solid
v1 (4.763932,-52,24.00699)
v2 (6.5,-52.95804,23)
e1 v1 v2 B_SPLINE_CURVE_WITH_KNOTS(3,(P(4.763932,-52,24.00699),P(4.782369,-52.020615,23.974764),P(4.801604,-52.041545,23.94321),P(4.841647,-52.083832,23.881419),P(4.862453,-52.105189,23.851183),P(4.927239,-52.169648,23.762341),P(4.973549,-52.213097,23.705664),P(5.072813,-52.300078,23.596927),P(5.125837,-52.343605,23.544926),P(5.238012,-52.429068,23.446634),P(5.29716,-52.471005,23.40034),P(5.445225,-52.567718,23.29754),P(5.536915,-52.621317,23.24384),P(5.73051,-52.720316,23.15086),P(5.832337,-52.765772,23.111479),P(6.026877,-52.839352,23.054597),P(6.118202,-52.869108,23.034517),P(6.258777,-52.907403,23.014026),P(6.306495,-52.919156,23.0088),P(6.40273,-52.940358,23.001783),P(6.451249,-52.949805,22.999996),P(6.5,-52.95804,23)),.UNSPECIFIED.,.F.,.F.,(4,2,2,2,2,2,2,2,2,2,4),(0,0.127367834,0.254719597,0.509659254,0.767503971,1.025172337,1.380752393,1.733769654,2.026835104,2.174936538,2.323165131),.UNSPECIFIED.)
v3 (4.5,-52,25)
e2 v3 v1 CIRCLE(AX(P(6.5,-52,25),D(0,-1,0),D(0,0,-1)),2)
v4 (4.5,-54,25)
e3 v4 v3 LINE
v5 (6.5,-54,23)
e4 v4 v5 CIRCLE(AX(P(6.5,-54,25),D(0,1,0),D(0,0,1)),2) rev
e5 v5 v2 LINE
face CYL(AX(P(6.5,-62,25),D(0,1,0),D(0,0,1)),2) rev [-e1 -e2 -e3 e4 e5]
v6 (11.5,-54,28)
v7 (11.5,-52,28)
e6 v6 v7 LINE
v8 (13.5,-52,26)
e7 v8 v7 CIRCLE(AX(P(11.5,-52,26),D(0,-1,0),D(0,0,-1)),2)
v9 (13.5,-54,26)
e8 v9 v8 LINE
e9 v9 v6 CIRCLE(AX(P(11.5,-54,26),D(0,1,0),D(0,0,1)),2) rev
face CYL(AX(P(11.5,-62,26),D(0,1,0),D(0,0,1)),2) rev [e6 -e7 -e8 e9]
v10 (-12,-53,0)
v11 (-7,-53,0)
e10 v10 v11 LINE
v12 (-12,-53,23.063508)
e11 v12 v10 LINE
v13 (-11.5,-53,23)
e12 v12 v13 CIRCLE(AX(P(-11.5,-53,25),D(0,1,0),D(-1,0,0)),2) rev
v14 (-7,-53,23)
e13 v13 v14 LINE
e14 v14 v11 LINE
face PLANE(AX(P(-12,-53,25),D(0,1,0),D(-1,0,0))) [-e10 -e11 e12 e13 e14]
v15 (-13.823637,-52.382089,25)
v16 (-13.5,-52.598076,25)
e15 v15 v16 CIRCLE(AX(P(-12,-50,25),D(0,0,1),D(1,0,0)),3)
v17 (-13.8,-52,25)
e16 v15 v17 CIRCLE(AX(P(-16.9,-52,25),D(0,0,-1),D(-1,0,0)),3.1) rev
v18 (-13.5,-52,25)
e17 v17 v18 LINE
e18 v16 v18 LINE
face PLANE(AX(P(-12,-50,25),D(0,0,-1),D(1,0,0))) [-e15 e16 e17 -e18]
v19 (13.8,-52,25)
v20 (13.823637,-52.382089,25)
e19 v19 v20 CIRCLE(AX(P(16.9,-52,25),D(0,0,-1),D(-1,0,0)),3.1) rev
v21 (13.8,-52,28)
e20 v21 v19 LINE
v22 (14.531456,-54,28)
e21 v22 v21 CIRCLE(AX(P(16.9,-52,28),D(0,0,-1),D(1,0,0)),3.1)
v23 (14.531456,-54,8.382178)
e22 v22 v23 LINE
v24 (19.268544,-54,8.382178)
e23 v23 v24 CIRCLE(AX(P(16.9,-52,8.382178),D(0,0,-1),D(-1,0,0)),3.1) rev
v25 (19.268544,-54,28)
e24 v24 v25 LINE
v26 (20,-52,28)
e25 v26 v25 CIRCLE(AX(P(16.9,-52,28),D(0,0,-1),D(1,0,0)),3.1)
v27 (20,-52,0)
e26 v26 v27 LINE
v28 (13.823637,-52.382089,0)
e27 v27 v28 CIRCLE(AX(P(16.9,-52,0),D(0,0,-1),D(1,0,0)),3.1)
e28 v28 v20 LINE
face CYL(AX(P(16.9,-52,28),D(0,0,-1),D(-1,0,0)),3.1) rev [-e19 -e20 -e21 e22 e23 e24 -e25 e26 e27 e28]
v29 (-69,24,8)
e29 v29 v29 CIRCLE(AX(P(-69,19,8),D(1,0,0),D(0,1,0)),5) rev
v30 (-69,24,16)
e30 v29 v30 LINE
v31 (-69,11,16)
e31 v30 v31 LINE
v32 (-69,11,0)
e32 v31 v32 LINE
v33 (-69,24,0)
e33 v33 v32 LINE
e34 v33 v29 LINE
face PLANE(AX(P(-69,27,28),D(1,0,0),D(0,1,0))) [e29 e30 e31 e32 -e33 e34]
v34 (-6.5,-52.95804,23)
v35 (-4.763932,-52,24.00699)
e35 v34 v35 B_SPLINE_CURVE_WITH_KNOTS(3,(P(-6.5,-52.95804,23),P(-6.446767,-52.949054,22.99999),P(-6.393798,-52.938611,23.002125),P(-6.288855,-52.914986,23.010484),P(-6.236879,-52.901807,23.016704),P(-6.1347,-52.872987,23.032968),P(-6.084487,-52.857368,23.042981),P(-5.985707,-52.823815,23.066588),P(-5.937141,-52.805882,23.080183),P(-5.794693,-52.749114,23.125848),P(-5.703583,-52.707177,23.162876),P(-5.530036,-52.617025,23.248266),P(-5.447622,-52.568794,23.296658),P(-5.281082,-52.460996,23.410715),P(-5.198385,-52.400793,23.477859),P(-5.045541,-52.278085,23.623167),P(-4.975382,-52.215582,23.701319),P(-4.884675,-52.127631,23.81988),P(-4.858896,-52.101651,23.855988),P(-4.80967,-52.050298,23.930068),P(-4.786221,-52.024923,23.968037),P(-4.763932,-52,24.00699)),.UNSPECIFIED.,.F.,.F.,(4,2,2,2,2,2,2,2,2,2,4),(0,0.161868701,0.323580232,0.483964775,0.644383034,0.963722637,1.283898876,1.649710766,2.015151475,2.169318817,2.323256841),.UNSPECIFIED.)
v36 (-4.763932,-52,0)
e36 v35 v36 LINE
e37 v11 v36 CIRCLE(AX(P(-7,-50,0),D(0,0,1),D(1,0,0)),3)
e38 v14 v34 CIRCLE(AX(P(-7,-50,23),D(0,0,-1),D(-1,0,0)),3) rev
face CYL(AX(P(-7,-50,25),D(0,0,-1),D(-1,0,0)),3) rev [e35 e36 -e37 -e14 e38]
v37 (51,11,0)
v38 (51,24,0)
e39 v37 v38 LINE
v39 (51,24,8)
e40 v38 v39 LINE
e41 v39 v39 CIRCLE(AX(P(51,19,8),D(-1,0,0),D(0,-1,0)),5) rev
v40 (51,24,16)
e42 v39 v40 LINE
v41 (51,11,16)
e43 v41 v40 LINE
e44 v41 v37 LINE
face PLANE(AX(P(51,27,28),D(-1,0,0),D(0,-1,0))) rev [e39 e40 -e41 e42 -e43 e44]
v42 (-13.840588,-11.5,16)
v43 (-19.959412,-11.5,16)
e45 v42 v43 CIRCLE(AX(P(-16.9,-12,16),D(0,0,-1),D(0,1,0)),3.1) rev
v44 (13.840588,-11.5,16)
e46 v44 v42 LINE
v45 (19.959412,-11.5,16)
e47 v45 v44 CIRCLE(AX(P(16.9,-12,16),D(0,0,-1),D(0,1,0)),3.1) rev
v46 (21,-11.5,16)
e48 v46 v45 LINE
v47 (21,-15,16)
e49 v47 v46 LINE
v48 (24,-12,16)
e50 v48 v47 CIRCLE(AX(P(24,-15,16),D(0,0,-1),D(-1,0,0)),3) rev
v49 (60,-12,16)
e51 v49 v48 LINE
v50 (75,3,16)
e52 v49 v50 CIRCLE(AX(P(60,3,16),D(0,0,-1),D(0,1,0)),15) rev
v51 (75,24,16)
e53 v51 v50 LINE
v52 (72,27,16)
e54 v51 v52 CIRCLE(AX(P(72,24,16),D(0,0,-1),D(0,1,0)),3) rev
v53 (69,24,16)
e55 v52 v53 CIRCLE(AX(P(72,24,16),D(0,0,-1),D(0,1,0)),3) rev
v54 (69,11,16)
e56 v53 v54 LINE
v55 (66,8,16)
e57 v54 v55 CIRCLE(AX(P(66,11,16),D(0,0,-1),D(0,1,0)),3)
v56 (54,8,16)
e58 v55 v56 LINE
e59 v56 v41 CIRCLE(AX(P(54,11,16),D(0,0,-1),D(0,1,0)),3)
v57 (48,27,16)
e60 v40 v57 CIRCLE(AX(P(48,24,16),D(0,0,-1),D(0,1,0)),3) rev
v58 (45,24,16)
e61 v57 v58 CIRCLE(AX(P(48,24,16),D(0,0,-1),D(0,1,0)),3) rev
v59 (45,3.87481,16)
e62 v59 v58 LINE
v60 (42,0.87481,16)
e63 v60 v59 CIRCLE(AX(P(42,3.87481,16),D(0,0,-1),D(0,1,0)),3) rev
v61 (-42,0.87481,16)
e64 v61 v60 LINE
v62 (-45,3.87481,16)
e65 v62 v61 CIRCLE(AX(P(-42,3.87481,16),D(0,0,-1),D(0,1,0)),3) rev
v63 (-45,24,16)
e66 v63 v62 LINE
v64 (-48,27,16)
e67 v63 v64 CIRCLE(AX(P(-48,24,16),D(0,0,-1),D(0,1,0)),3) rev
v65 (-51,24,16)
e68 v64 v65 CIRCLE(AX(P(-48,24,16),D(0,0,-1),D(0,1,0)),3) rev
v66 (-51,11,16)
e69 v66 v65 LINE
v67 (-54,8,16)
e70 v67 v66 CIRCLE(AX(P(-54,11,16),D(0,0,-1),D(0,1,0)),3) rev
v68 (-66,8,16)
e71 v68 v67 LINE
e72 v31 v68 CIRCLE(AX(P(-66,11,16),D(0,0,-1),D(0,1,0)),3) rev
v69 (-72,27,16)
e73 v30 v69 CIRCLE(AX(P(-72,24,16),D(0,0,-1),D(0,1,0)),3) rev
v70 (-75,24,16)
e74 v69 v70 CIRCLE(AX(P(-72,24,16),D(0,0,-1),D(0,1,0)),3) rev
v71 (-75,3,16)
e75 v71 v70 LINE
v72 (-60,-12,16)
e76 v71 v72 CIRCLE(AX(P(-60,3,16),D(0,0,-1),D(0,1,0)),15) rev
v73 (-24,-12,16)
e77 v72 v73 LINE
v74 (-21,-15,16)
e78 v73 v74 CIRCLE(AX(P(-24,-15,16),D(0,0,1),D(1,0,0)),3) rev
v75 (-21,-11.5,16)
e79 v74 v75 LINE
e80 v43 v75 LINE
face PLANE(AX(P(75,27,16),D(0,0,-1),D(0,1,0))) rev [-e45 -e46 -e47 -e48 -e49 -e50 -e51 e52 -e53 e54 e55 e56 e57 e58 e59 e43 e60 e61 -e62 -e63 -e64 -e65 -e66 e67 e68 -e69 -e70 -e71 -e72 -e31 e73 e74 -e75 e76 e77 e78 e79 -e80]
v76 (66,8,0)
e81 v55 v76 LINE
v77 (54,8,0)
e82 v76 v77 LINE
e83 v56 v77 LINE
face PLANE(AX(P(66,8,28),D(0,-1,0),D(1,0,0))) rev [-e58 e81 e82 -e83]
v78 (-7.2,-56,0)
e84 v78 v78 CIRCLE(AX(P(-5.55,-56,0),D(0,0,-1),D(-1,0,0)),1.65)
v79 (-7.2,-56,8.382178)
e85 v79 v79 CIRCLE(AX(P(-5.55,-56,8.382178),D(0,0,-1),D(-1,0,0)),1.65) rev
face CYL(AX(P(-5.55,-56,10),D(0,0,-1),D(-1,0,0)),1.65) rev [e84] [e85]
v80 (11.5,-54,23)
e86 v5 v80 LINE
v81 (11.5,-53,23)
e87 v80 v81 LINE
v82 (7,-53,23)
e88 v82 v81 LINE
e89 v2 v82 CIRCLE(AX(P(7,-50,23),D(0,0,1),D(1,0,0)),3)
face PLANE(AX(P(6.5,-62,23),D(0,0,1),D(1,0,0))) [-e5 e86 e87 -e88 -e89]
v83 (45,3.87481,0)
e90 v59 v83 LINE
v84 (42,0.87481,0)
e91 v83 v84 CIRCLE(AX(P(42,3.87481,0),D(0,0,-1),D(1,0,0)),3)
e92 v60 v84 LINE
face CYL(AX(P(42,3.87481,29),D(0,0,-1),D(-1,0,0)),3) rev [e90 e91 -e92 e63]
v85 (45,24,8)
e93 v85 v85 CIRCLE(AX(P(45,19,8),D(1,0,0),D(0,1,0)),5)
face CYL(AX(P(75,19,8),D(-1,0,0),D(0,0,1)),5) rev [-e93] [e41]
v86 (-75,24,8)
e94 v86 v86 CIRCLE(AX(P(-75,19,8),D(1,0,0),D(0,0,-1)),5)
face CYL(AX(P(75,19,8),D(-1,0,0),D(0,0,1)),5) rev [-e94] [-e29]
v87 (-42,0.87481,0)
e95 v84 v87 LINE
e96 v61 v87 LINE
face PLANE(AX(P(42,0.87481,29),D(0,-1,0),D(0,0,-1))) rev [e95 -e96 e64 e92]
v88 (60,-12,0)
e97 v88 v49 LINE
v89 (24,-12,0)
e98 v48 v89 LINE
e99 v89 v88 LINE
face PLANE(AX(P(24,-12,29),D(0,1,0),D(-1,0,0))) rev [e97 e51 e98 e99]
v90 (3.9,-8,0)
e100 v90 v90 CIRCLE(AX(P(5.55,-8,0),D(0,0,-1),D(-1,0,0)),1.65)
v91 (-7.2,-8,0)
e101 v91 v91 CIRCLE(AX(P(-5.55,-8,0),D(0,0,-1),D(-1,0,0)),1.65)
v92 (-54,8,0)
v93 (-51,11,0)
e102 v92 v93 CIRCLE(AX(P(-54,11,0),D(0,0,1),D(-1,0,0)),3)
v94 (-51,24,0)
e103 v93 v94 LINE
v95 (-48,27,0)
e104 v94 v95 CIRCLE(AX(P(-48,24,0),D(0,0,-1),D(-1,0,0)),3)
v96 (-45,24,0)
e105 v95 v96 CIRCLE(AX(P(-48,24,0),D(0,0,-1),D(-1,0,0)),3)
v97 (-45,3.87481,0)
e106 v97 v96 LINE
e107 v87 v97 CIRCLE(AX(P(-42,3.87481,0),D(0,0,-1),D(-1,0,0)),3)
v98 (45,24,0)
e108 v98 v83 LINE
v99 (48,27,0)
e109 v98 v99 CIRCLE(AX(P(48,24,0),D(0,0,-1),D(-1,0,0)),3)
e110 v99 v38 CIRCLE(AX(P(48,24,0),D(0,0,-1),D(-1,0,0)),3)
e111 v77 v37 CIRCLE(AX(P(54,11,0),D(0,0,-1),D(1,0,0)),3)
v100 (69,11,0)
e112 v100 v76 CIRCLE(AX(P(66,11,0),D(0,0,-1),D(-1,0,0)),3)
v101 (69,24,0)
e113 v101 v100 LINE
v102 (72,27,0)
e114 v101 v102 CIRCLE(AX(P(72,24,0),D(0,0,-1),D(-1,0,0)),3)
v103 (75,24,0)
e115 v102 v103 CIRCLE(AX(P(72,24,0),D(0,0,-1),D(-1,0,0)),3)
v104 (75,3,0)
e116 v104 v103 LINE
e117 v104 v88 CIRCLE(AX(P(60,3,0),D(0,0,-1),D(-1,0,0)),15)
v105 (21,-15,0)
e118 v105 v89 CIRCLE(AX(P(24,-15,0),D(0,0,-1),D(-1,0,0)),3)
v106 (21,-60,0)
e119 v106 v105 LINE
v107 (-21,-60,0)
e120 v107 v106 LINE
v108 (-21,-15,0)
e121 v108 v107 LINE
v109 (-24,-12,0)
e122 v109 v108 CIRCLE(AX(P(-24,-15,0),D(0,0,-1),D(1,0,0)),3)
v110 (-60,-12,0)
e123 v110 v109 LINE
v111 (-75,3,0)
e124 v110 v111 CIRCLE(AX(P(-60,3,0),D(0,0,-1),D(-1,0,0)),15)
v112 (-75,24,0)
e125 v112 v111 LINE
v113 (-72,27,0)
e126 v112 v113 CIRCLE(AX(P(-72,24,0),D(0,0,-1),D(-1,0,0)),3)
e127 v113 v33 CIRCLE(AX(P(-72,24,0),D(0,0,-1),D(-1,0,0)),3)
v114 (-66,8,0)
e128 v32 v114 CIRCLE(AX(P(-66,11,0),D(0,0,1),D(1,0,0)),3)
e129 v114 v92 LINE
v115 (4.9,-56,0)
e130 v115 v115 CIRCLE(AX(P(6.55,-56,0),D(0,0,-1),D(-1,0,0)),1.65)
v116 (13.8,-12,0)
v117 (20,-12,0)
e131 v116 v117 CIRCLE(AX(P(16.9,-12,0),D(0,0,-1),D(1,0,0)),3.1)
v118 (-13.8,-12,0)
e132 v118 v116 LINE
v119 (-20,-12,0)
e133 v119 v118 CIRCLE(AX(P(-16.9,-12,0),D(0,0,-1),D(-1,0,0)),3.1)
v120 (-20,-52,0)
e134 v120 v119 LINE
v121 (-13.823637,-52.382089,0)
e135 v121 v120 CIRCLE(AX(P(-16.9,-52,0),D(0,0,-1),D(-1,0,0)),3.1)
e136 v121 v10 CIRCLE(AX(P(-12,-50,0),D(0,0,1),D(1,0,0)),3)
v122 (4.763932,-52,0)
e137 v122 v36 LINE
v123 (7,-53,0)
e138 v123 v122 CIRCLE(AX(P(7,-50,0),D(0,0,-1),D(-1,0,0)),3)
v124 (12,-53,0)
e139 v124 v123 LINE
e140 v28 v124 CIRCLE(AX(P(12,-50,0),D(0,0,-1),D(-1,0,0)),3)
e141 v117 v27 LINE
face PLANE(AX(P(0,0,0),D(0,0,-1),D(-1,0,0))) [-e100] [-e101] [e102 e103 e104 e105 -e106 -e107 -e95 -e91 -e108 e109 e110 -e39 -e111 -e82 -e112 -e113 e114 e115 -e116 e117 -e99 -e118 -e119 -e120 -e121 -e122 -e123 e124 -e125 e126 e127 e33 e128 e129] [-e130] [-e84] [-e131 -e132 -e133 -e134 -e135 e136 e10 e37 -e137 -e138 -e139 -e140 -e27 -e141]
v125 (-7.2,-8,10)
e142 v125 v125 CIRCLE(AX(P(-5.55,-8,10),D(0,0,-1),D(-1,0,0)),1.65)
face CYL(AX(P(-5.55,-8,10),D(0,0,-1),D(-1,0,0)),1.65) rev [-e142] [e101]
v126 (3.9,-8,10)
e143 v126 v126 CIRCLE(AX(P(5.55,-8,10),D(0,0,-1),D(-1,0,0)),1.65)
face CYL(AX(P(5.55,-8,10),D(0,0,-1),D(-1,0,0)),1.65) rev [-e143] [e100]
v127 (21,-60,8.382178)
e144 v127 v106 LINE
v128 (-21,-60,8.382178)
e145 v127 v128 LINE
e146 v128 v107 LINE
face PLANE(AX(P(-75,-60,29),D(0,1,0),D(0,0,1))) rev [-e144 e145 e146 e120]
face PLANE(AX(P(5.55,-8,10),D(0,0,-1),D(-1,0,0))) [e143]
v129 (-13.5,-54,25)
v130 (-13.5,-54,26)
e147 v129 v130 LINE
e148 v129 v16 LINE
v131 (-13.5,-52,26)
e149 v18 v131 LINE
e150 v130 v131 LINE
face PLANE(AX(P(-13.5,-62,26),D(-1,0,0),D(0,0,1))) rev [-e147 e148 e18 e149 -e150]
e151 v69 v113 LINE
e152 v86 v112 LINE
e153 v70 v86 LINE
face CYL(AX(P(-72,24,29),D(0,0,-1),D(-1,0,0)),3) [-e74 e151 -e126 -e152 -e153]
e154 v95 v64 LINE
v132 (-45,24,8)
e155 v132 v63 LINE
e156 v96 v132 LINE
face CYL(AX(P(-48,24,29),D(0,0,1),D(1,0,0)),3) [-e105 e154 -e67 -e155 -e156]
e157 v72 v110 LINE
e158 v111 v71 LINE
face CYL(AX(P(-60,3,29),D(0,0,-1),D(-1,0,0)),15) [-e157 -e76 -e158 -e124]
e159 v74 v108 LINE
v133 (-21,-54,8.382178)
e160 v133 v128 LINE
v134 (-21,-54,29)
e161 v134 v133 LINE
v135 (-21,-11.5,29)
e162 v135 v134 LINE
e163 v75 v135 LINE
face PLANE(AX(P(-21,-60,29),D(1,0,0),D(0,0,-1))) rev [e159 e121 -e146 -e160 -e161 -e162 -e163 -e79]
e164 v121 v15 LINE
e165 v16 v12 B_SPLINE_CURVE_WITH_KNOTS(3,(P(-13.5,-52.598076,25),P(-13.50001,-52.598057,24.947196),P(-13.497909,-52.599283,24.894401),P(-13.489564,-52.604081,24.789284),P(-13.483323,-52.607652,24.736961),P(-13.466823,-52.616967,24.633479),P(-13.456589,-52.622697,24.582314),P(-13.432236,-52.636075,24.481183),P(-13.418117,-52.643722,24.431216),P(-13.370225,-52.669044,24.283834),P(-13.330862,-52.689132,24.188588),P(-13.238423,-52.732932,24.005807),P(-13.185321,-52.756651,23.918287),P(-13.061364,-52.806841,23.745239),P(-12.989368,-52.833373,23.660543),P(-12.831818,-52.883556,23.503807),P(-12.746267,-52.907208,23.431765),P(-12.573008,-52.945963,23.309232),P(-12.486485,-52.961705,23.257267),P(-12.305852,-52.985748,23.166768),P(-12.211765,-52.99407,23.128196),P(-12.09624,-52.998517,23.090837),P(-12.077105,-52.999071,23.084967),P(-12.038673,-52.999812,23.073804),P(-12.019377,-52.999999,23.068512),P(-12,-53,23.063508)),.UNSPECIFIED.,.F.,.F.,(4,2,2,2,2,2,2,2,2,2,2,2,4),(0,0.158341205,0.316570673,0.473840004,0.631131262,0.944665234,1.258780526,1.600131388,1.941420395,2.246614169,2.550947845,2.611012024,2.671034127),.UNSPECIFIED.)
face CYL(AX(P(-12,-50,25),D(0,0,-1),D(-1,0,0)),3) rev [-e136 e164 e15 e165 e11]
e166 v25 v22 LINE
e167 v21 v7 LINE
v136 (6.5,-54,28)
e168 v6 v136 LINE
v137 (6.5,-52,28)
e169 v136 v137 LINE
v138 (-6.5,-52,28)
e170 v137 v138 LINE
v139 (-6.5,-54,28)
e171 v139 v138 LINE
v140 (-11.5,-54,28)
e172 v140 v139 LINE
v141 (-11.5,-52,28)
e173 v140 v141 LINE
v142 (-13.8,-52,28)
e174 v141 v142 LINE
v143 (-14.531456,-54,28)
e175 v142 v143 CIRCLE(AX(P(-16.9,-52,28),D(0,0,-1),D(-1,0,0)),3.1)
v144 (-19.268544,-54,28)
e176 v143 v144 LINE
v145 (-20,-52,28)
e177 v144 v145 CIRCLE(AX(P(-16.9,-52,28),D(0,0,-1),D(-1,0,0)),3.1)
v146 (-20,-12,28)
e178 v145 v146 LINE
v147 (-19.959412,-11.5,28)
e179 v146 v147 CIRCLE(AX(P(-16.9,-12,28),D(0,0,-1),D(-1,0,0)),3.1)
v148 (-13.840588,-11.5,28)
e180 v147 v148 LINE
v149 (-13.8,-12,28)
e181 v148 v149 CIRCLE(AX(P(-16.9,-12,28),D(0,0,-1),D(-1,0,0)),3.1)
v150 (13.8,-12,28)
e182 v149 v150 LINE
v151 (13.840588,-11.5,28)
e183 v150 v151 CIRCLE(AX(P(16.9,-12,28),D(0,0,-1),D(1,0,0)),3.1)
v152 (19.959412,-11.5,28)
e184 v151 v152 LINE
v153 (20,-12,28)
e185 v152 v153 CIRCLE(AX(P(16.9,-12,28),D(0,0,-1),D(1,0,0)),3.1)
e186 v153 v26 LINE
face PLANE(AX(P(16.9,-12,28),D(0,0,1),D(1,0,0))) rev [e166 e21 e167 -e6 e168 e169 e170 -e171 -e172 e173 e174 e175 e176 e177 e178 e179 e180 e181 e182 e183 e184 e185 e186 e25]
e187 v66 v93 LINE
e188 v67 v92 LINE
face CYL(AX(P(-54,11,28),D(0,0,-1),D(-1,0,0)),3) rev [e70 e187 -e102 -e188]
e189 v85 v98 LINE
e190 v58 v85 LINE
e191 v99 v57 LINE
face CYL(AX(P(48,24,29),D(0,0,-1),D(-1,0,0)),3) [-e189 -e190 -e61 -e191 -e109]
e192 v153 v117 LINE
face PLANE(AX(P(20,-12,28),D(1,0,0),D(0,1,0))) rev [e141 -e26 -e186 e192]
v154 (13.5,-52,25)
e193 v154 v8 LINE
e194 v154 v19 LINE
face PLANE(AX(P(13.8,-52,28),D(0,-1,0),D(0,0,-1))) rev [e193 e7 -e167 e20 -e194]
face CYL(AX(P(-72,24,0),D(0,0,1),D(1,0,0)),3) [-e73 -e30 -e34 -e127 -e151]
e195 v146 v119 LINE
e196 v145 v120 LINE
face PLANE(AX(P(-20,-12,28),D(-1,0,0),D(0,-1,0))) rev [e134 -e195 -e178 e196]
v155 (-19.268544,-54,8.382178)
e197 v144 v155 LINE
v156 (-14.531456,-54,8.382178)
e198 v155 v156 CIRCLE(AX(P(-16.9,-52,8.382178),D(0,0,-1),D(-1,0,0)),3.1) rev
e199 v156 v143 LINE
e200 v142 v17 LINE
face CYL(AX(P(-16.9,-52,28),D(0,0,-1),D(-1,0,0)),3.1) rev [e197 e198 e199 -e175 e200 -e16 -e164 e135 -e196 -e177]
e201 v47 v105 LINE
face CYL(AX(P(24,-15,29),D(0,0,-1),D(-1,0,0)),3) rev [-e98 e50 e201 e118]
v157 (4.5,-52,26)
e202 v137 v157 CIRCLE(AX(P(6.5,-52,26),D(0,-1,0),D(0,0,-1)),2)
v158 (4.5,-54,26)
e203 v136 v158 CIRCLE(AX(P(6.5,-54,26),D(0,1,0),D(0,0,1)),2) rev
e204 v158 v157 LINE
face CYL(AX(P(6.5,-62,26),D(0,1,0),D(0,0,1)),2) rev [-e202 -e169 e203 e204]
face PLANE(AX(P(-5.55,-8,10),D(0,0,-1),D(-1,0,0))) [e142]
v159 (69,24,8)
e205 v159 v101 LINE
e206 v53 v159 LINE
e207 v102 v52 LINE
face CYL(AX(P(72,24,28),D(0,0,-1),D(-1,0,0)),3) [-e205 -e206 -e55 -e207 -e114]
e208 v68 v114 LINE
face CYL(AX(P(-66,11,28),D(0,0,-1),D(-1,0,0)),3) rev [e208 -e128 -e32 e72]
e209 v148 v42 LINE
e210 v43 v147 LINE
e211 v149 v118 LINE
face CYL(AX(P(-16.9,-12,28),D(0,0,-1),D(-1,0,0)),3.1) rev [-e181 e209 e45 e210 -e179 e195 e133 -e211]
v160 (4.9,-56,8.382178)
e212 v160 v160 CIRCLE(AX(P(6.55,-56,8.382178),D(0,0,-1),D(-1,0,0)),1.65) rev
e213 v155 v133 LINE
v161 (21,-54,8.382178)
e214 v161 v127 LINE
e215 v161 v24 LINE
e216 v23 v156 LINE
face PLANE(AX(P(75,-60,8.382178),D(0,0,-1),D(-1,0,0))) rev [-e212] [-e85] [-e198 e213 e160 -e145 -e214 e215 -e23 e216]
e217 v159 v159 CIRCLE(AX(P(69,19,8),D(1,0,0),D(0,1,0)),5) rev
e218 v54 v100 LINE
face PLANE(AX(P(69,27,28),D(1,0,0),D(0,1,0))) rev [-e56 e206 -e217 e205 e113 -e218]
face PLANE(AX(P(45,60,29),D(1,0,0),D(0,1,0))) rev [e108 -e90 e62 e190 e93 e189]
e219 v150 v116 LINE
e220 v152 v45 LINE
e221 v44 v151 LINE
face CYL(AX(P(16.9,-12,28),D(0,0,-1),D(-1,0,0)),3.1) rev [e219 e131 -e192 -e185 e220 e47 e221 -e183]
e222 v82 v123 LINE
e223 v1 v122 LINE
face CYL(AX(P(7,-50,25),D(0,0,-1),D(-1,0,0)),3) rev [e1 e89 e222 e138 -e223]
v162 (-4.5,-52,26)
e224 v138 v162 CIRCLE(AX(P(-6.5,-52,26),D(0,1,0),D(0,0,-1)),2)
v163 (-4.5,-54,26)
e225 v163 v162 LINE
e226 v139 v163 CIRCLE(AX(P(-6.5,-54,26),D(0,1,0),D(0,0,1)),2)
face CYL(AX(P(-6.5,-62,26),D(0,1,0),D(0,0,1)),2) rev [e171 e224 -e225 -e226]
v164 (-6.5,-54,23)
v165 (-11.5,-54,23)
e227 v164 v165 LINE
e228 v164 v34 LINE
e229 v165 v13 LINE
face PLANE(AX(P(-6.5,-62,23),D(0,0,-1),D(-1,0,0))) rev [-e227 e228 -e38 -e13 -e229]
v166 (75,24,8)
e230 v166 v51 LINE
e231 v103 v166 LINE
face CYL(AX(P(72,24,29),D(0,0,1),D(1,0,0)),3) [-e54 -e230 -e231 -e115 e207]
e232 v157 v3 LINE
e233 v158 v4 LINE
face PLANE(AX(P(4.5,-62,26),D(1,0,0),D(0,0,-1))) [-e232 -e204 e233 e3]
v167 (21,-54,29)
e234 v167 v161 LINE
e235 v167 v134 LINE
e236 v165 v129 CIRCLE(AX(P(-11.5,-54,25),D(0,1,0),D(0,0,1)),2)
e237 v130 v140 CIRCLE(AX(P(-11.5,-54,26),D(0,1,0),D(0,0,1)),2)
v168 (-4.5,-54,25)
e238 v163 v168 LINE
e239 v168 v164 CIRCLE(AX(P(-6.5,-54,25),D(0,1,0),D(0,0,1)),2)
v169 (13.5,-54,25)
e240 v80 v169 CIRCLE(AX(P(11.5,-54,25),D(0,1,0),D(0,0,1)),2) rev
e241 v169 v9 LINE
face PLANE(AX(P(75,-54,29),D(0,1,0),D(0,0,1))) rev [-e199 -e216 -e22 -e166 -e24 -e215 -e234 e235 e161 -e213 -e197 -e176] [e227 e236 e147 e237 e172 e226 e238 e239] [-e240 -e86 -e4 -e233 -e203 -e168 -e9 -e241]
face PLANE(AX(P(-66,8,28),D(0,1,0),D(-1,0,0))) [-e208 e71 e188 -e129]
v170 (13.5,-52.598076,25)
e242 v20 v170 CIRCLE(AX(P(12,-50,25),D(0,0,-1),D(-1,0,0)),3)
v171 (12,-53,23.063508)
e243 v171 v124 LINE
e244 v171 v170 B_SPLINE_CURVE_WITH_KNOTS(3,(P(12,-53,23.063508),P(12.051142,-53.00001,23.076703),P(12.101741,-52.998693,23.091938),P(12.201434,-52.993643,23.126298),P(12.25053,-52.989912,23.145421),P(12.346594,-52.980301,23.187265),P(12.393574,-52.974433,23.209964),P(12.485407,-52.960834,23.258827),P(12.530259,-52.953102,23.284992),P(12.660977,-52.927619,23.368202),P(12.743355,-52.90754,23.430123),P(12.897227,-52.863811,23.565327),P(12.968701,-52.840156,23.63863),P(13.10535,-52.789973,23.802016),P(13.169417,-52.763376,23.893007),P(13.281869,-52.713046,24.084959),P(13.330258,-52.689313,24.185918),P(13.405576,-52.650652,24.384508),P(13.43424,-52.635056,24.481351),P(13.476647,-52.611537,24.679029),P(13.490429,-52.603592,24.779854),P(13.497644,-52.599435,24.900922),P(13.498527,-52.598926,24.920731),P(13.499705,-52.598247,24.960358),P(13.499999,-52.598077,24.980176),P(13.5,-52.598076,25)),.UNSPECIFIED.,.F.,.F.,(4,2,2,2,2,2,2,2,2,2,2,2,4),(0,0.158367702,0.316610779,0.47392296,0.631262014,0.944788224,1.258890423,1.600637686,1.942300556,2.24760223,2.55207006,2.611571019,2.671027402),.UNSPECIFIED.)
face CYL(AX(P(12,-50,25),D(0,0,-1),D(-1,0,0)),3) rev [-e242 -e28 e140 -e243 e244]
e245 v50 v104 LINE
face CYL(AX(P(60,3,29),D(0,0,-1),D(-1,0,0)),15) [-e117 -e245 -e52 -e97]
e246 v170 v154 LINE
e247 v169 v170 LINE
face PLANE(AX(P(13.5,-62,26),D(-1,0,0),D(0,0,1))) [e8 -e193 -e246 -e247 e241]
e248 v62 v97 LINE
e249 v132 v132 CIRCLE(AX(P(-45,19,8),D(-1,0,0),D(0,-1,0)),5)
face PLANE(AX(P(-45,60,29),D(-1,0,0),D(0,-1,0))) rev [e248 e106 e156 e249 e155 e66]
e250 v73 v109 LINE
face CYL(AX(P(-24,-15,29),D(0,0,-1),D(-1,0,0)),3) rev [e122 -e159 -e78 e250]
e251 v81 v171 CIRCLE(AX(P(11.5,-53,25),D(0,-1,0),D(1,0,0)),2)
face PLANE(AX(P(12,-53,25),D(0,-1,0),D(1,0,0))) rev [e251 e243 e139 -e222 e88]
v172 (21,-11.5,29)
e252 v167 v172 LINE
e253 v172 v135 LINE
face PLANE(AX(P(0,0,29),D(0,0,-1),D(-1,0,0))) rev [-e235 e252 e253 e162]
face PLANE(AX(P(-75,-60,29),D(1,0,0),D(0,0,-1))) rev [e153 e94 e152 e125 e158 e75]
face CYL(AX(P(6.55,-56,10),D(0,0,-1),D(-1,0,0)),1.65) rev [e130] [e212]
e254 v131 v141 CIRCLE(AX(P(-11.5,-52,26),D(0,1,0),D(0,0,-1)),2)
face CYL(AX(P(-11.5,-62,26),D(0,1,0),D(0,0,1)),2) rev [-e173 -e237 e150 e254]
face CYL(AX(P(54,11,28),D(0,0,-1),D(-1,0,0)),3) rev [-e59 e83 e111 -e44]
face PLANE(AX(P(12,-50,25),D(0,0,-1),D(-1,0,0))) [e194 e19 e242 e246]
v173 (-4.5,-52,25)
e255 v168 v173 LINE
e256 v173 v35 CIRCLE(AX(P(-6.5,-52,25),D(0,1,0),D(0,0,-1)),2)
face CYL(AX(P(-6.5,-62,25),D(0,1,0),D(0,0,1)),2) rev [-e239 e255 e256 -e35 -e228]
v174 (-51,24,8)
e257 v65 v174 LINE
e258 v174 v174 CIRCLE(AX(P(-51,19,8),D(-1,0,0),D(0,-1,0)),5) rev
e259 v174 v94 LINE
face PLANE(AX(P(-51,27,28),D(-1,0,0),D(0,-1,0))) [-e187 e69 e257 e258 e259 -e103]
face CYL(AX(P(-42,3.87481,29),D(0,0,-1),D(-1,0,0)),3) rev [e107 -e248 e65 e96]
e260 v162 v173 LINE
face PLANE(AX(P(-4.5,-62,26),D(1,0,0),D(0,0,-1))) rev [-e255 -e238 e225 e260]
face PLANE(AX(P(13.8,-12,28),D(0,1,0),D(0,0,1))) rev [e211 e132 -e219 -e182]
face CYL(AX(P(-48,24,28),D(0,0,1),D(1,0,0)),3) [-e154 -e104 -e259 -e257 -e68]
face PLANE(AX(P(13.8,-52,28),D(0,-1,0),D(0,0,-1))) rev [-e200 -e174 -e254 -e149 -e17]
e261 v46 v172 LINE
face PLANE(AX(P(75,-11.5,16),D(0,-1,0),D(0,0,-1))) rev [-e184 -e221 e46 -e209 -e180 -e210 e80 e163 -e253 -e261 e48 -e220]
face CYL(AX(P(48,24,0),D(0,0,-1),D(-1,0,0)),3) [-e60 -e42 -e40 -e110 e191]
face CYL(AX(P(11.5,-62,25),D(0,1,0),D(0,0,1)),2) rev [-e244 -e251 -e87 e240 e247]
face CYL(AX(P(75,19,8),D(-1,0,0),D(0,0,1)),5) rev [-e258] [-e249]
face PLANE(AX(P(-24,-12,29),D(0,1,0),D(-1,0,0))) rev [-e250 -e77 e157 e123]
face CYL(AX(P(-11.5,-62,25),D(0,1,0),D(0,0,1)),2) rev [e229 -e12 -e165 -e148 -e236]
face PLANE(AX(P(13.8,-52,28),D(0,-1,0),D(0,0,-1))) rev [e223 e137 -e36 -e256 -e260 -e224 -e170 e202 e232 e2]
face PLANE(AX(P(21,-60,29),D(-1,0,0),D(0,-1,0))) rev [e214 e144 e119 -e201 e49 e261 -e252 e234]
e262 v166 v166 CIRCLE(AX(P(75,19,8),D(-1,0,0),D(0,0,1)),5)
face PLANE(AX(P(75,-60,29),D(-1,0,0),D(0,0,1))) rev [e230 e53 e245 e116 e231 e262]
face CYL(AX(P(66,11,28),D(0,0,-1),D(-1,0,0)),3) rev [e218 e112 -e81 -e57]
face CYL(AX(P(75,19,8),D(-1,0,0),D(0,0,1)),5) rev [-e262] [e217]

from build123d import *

# Parameters (mm, degrees)
ESQUISSE1_W                  = 150
ESQUISSE1_H                  = 120
BOSS_EXTRU_1_DEPTH           = 29
ENL_V_MAT_EXTRU_1_DEPTH      = 28
ENL_V_MAT_EXTRU_2_DEPTH      = 101.329457289
ENL_V_MAT_EXTRU_3_DEPTH      = 101.329457289
ENL_V_MAT_EXTRU_4_DEPTH      = 165.137137784
ENL_V_MAT_EXTRU_4_DEPTH_BACK = 165.137137784
ESQUISSE6_R                  = 5
ENL_V_MAT_EXTRU_6_DEPTH      = 165.137137784
ENL_V_MAT_EXTRU_6_DEPTH_BACK = 165.137137784
ENL_V_MAT_EXTRU_8_DEPTH      = 28
ESQUISSE13_R                 = 1.65
ENL_V_MAT_EXTRU_9_DEPTH      = 10
CONG_1_DEPTH                 = 30
CONG_2_R                     = 15
ESQUISSE14_W                 = 20.617821527
ESQUISSE14_H                 = 6
ENL_V_MAT_EXTRU_10_DEPTH     = 117.86316785
ENL_V_MAT_EXTRU_11_DEPTH     = 10
ENL_V_MAT_EXTRU_14_DEPTH     = 25
CONG_6_R                     = 3
ESQUISSE17_W                 = 39.451580469
ESQUISSE17_H                 = 13
ENL_V_MAT_EXTRU_15_DEPTH     = 22
ESQUISSE18_W                 = 3.388992405
ESQUISSE18_H                 = 13
ENL_V_MAT_EXTRU_16_DEPTH     = 22


with BuildPart() as part:
    # Esquisse1 → Boss.-Extru.1 (new body)
    with BuildSketch(Plane.XY):
        Rectangle(ESQUISSE1_W, ESQUISSE1_H)
    extrude(amount=BOSS_EXTRU_1_DEPTH)

    # Esquisse2 → Enlèv. mat.-Extru.1 (cut)
    with BuildSketch(Plane(origin=(0, 0, 0), x_dir=(-1, 0, 0), z_dir=(0, 0, -1))):
        with BuildLine():
            Line((-13.8, -12), (13.8, -12))
            ThreePointArc((13.8, -12), (16.9, -8.9), (20, -12))
            Line((20, -12), (20, -52))
            ThreePointArc((20, -52), (16.9, -55.1), (13.8, -52))
            Line((13.8, -52), (-13.8, -52))
            ThreePointArc((-13.8, -52), (-16.9, -55.1), (-20, -52))
            Line((-20, -52), (-20, -12))
            ThreePointArc((-20, -12), (-16.9, -8.9), (-13.8, -12))
        make_face()
    extrude(amount=-ENL_V_MAT_EXTRU_1_DEPTH, mode=Mode.SUBTRACT)

    # Esquisse3 → Enlèv. mat.-Extru.2 (cut, through all)
    with BuildSketch(Plane(origin=(0, 0, 0), x_dir=(-1, 0, 0), z_dir=(0, 0, -1))):
        with BuildLine():
            Line((-24, -12), (-75, -12))
            Line((-75, -12), (-75, -60))
            Line((-75, -60), (-21, -60))
            Line((-21, -60), (-21, -15))
            ThreePointArc((-21, -15), (-21.878679656, -12.878679656), (-24, -12))
        make_face()
        with BuildLine():
            Line((24, -12), (75, -12))
            Line((75, -12), (75, -60))
            Line((75, -60), (21, -60))
            Line((21, -60), (21, -15))
            ThreePointArc((21, -15), (21.878679656, -12.878679656), (24, -12))
        make_face()
    extrude(amount=-ENL_V_MAT_EXTRU_2_DEPTH, mode=Mode.SUBTRACT)

    # Esquisse5 → Enlèv. mat.-Extru.3 (cut, through all)
    with BuildSketch(Plane(origin=(0, 0, 0), x_dir=(-1, 0, 0), z_dir=(0, 0, -1))):
        with BuildLine():
            Line((-45, 60), (45, 60))
            Line((45, 60), (45, 3.874810027))
            ThreePointArc((45, 3.874810027), (44.121320344, 1.753489683), (42, 0.874810027))
            Line((42, 0.874810027), (-42, 0.874810027))
            ThreePointArc((-42, 0.874810027), (-44.121320344, 1.753489683), (-45, 3.874810027))
            Line((-45, 3.874810027), (-45, 60))
        make_face()
    extrude(amount=-ENL_V_MAT_EXTRU_3_DEPTH, mode=Mode.SUBTRACT)

    # Esquisse6 → Enlèv. mat.-Extru.4 (cut, two sides: drawn at the far end of the back side and taken through both)
    with BuildSketch(Plane.ZY.offset(75).offset(-ENL_V_MAT_EXTRU_4_DEPTH_BACK)):
        with Locations((8, 19)):
            Circle(ESQUISSE6_R)
    extrude(amount=ENL_V_MAT_EXTRU_4_DEPTH + ENL_V_MAT_EXTRU_4_DEPTH_BACK, mode=Mode.SUBTRACT)

    # Esquisse9 → Enlèv. mat.-Extru.6 (cut, two sides: drawn at the far end of the back side and taken through both)
    with BuildSketch(Plane.ZY.offset(75).offset(-ENL_V_MAT_EXTRU_6_DEPTH_BACK)):
        Polygon((0, 27), (16, 27), (16, -11.5), (29, -11.5), (29, 60), (0, 60), align=None)
    extrude(amount=ENL_V_MAT_EXTRU_6_DEPTH + ENL_V_MAT_EXTRU_6_DEPTH_BACK, mode=Mode.SUBTRACT)

    # Esquisse12 → Enlèv. mat.-Extru.8 (cut)
    with BuildSketch(Plane(origin=(0, 0, 0), x_dir=(-1, 0, 0), z_dir=(0, 0, -1))):
        with BuildLine():
            Line((-69, 27), (-69, 11))
            ThreePointArc((-69, 11), (-68.121320344, 8.878679656), (-66, 8))
            Line((-66, 8), (-54, 8))
            ThreePointArc((-54, 8), (-51.878679656, 8.878679656), (-51, 11))
            Line((-51, 11), (-51, 27))
            Line((-51, 27), (-69, 27))
        make_face()
    enl_v_mat_extru_8 = extrude(amount=-ENL_V_MAT_EXTRU_8_DEPTH, mode=Mode.SUBTRACT)

    # Symétrie1: Enlèv. mat.-Extru.8 across plane
    add(enl_v_mat_extru_8.mirror(Plane(origin=(0, 0, 0), x_dir=(0, 0, 1), z_dir=(1, 0, 0))), mode=Mode.SUBTRACT)

    # Esquisse13 → Enlèv. mat.-Extru.9 (cut)
    with BuildSketch(Plane(origin=(0, 0, 0), x_dir=(-1, 0, 0), z_dir=(0, 0, -1))):
        with Locations((-5.55, -8)):
            Circle(ESQUISSE13_R)
        with Locations((5.55, -8)):
            Circle(ESQUISSE13_R)
        with Locations((-6.55, -56)):
            Circle(ESQUISSE13_R)
        with Locations((5.55, -56)):
            Circle(ESQUISSE13_R)
    extrude(amount=-ENL_V_MAT_EXTRU_9_DEPTH, mode=Mode.SUBTRACT)

    # Congé1: read off the stored shape, not the designer's step
    # Congé1 outline → Congé1 (cut)
    with BuildSketch(Plane.XY):
        with BuildLine():
            Line((-75, -12), (-60, -12))
            ThreePointArc((-60, -12), (-70.606601718, -7.606601718), (-75, 3))
            Line((-75, 3), (-75, -12))
        make_face()
    extrude(amount=CONG_1_DEPTH, mode=Mode.SUBTRACT)

    # Congé2
    cong_2_edges = [part.edges().sort_by_distance(p)[0] for p in [
        (75, -12, 14.5),
    ]]
    fillet(cong_2_edges, radius=CONG_2_R)

    # Esquisse14 → Enlèv. mat.-Extru.10 (cut, through all)
    with BuildSketch(Plane.ZY.offset(21)):
        with Locations((18.691089237, -57)):
            Rectangle(ESQUISSE14_W, ESQUISSE14_H)
    extrude(amount=-ENL_V_MAT_EXTRU_10_DEPTH, mode=Mode.SUBTRACT)

    # Esquisse15 → Enlèv. mat.-Extru.11 (cut)
    with BuildSketch(Plane(origin=(0, -52, 0), x_dir=(1, 0, 0), z_dir=(0, 1, 0))):
        with BuildLine():
            Line((-13.5, -26), (-13.5, -25))
            ThreePointArc((-13.5, -25), (-12.914213562, -23.585786438), (-11.5, -23))
            Line((-11.5, -23), (-6.5, -23))
            ThreePointArc((-6.5, -23), (-5.085786438, -23.585786438), (-4.5, -25))
            Line((-4.5, -25), (-4.5, -26))
            ThreePointArc((-4.5, -26), (-5.085786438, -27.414213562), (-6.5, -28))
            Line((-6.5, -28), (-11.5, -28))
            ThreePointArc((-11.5, -28), (-12.914213562, -27.414213562), (-13.5, -26))
        make_face()
    enl_v_mat_extru_11 = extrude(amount=-ENL_V_MAT_EXTRU_11_DEPTH, mode=Mode.SUBTRACT)

    # Symétrie4: Enlèv. mat.-Extru.11 across plane
    add(enl_v_mat_extru_11.mirror(Plane(origin=(0, 0, 0), x_dir=(0, 0, 1), z_dir=(1, 0, 0))), mode=Mode.SUBTRACT)

    # Esquisse16 → Enlèv. mat.-Extru.14 (cut)
    with BuildSketch(Plane(origin=(0, 0, 0), x_dir=(-1, 0, 0), z_dir=(0, 0, -1))):
        with BuildLine():
            Line((-12, -53), (-7, -53))
            ThreePointArc((-7, -53), (-4.878679656, -52.121320344), (-4, -50))
            Line((-4, -50), (-15, -50))
            ThreePointArc((-15, -50), (-14.121320344, -52.121320344), (-12, -53))
        make_face()
    enl_v_mat_extru_14 = extrude(amount=-ENL_V_MAT_EXTRU_14_DEPTH, mode=Mode.SUBTRACT)

    # Symétrie5: Enlèv. mat.-Extru.14 across plane
    add(enl_v_mat_extru_14.mirror(Plane(origin=(0, 0, 0), x_dir=(0, 0, 1), z_dir=(1, 0, 0))), mode=Mode.SUBTRACT)

    # Congé6
    cong_6_edges = [part.edges().sort_by_distance(p)[0] for p in [
        (-75, 27, 8),
        (-69, 27, 8),
        (-45, 27, 8),
        (-51, 27, 8),
        (75, 27, 8),
        (69, 27, 8),
        (51, 27, 8),
        (45, 27, 8),
    ]]
    fillet(cong_6_edges, radius=CONG_6_R - 0.0001)  # a hair under: the kernel refuses the full size

    # Esquisse17 → Enlèv. mat.-Extru.15 (cut)
    with BuildSketch(Plane(origin=(0, -11.5, 0), x_dir=(1, 0, 0), z_dir=(0, 1, 0))):
        with Locations((44.114782639, -22.5)):
            Rectangle(ESQUISSE17_W, ESQUISSE17_H)
    enl_v_mat_extru_15 = extrude(amount=-ENL_V_MAT_EXTRU_15_DEPTH, mode=Mode.SUBTRACT)

    # Symétrie6: Enlèv. mat.-Extru.15 across plane
    add(enl_v_mat_extru_15.mirror(Plane(origin=(0, 0, 0), x_dir=(0, 0, 1), z_dir=(1, 0, 0))), mode=Mode.SUBTRACT)

    # Esquisse18 → Enlèv. mat.-Extru.16 (cut)
    with BuildSketch(Plane(origin=(0, -11.5, 0), x_dir=(1, 0, 0), z_dir=(0, 1, 0))):
        with Locations((22.694496202, -22.5)):
            Rectangle(ESQUISSE18_W, ESQUISSE18_H)
    enl_v_mat_extru_16 = extrude(amount=-ENL_V_MAT_EXTRU_16_DEPTH, mode=Mode.SUBTRACT)

    # Symétrie7: Enlèv. mat.-Extru.16 across plane
    add(enl_v_mat_extru_16.mirror(Plane(origin=(0, 0, 0), x_dir=(0, 0, 1), z_dir=(1, 0, 0))), mode=Mode.SUBTRACT)


solid = part.part
